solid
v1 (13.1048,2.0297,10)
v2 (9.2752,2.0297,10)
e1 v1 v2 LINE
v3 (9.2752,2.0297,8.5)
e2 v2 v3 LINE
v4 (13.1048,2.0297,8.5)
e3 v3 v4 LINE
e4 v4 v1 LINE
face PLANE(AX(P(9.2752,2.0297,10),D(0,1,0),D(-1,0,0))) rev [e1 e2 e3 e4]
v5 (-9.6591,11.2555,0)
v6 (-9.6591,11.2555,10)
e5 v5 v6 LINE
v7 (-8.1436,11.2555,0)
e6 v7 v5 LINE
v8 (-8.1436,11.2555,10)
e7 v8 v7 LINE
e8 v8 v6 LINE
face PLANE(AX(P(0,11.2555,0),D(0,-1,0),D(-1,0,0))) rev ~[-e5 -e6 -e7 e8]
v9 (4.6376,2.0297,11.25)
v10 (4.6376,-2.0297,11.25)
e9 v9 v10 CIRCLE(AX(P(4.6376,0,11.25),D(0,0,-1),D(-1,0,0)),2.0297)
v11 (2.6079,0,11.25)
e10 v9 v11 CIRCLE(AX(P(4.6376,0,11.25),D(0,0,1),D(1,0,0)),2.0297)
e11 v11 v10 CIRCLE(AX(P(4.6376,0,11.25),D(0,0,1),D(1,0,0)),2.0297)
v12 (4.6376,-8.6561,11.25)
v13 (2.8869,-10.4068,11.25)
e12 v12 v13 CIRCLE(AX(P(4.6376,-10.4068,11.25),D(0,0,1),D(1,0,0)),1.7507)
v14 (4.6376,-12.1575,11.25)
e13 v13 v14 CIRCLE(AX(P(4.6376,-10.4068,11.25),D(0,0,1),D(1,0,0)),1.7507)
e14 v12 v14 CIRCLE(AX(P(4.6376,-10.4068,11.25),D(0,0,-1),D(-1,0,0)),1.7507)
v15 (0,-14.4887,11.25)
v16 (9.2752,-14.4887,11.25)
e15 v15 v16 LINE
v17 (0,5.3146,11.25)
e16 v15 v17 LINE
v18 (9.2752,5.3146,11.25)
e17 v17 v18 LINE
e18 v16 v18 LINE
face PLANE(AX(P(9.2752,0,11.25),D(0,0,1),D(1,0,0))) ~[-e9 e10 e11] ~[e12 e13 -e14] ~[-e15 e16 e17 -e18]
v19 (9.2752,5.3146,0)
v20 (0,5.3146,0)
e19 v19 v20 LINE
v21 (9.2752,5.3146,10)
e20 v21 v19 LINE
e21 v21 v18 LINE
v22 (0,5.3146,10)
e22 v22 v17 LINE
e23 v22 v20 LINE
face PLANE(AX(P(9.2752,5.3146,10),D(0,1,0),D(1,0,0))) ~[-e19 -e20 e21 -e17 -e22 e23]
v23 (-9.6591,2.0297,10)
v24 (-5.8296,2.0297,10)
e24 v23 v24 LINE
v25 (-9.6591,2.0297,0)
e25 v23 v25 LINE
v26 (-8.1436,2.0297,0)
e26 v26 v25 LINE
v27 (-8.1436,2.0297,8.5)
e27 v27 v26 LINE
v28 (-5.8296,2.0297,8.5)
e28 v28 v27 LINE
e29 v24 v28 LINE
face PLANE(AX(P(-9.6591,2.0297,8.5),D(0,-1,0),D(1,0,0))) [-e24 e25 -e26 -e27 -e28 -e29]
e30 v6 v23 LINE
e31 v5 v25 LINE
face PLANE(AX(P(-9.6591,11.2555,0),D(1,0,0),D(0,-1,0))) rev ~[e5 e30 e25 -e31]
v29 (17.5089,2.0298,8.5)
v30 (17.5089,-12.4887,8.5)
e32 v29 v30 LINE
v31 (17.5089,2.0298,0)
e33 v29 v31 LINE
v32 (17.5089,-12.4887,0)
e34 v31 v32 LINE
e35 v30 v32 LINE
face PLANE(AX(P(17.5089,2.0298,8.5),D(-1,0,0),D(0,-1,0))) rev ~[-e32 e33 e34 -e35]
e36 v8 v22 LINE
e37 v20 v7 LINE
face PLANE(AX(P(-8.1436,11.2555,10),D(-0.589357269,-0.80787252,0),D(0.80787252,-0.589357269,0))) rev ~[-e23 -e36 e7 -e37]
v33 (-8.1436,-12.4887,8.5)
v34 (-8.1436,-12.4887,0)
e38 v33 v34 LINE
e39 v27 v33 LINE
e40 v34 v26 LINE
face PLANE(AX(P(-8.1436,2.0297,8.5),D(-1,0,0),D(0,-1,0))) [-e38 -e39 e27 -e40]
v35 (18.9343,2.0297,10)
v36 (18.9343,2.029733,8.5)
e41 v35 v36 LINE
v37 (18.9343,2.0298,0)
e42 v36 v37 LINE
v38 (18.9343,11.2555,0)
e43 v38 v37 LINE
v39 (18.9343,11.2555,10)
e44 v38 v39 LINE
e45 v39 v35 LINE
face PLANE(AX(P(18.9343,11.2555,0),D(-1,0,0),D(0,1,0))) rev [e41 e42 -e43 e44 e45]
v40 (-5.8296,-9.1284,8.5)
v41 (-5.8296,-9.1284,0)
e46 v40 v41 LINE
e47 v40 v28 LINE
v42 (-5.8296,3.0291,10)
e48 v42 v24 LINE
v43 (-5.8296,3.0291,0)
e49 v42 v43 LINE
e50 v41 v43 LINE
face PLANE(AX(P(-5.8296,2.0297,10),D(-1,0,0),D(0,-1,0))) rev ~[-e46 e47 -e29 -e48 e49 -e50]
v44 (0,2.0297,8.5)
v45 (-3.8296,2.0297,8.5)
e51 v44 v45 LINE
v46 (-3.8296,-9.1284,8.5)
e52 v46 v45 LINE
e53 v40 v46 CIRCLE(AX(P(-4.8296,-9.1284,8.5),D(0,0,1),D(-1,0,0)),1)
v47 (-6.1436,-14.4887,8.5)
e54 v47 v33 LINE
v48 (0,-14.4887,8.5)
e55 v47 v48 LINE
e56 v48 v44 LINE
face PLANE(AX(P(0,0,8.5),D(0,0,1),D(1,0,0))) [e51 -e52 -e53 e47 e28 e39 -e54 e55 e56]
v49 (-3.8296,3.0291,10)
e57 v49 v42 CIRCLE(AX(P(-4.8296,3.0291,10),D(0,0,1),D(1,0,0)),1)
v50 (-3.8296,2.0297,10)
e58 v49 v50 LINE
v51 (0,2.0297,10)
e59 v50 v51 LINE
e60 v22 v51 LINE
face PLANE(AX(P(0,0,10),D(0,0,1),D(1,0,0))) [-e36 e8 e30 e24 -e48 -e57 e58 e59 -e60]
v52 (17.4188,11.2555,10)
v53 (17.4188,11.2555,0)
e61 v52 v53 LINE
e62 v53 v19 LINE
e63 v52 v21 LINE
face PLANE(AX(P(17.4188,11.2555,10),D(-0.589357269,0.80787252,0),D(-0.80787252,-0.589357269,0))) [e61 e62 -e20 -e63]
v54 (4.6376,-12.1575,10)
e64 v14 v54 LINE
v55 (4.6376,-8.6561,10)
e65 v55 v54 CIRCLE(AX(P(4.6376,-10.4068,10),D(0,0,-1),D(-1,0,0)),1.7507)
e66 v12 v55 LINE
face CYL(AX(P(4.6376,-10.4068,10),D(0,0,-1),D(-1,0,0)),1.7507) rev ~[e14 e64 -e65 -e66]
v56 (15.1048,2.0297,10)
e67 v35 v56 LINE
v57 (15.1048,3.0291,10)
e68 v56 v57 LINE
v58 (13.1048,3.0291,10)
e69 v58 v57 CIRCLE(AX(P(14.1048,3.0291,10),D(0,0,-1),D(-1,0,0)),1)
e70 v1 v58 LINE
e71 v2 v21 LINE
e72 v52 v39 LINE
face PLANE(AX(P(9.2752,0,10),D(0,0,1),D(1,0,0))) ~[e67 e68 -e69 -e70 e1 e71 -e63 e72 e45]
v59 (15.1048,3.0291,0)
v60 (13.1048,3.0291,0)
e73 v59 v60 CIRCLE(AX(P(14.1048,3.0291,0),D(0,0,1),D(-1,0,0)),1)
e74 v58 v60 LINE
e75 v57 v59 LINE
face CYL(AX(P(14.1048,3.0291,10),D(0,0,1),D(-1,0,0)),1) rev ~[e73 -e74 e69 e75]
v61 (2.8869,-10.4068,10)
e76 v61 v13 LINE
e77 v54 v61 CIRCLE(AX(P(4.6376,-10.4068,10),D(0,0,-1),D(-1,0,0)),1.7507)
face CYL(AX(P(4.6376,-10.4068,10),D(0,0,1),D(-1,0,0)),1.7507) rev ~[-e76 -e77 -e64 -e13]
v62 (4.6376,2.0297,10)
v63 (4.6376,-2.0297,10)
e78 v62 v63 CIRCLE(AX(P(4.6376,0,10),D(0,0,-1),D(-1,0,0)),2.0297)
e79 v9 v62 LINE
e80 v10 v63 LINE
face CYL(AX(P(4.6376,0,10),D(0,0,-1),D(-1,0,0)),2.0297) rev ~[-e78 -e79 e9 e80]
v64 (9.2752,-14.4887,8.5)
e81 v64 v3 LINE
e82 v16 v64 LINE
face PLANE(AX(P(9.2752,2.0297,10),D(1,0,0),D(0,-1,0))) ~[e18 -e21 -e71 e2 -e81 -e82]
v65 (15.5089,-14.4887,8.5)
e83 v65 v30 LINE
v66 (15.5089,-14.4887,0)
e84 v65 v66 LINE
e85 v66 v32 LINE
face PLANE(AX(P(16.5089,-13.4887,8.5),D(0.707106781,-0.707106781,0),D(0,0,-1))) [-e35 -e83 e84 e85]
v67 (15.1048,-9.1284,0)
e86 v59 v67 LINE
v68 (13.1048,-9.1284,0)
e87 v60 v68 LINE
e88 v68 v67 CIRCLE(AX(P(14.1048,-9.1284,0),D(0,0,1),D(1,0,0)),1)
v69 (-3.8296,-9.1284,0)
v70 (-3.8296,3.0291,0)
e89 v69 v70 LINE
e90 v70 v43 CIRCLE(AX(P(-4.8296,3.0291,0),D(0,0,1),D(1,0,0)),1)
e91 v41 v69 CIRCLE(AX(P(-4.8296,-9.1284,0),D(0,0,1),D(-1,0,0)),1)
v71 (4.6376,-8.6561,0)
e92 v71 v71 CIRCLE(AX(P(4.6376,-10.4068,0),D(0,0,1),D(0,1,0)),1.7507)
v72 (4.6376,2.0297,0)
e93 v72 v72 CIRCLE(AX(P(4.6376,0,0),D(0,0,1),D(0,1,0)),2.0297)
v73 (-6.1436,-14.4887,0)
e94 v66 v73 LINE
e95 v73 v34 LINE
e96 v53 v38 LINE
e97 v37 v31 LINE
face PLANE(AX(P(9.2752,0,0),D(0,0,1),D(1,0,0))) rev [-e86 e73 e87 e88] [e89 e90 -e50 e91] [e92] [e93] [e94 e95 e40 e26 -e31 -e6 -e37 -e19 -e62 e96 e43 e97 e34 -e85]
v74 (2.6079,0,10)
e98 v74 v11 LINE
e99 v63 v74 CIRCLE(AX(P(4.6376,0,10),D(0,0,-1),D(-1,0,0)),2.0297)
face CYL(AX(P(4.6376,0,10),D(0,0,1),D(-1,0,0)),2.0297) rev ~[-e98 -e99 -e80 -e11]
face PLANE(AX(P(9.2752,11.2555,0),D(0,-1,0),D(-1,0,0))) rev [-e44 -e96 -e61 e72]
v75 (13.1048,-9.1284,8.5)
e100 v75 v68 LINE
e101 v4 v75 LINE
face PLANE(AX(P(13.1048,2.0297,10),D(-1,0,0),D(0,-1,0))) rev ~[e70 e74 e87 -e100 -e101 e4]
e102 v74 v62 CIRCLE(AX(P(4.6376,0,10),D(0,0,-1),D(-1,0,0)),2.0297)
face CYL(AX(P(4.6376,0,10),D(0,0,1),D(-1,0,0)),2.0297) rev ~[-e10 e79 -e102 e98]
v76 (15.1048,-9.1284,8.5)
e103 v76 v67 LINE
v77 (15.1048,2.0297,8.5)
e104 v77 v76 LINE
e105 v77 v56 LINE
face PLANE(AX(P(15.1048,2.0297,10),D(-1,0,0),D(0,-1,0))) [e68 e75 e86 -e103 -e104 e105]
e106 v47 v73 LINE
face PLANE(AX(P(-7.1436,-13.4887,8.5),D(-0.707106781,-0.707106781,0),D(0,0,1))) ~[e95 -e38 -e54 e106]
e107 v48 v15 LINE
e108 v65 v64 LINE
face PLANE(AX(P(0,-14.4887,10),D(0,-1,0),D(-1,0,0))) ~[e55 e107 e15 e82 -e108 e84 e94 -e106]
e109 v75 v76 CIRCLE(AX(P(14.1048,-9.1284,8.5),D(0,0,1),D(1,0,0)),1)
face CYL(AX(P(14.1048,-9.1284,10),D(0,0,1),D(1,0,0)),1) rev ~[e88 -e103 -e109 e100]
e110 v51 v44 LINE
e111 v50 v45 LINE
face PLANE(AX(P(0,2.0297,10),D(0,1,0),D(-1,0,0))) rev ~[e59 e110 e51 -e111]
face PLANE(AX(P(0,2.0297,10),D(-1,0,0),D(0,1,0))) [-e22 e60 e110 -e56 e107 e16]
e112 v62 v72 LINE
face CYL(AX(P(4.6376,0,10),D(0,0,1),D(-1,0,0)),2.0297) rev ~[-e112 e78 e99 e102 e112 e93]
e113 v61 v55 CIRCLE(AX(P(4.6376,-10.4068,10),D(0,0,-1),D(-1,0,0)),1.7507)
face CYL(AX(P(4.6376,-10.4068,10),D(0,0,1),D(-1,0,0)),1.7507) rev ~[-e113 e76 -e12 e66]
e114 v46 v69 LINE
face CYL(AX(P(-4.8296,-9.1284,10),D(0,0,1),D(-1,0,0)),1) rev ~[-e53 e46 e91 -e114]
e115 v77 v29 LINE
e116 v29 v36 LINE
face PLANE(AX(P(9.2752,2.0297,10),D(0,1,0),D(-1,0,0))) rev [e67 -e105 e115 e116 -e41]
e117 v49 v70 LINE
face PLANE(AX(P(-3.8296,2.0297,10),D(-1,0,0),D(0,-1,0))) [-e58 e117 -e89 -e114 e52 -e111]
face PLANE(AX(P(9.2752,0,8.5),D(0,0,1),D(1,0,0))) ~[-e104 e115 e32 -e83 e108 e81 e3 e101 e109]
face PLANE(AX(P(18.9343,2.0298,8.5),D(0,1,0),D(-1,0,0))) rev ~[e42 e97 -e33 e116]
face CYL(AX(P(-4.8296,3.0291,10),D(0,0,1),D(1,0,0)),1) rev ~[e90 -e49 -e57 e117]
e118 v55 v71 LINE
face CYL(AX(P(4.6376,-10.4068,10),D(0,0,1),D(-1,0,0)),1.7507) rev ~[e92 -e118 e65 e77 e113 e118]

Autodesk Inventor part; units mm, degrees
ref_plane "YZ Plane" through (0, 0, 0) normal (1, 0, 0) x (0, 1, 0)
ref_plane "XZ Plane" through (0, 0, 0) normal (0, 1, 0) x (-1, 0, 0)
ref_plane "XY Plane" through (0, 0, 0) normal (0, 0, 1) x (1, 0, 0)
sketch "스케치1" plane through (0, 0, 0) normal (0, 0, 1) x (1, 0, 0)
  line L0 (0, 11.2555) -> (-9.6591, 11.2555)
  line L1 (-9.6591, 11.2555) -> (-9.6591, -14.4887)
  line L2 (-9.6591, -14.4887) -> (0, -14.4887)
  line L3 (0, -14.4887) -> (0, 11.2555)
  point P0 (0, 0)
extrude "돌출1" add sketch "스케치1" along normal blind 10
sketch "스케치2" plane through (0, 0, 10) normal (0, 0, 1) x (1, 0, 0)
  line L0 (0, 11.2555) -> (-9.6591, 11.2555) projected
  line L1 (0, -14.4887) -> (0, 11.2555) projected
  line L2 (-8.1436, 11.2555) -> (0, 5.3146)
  line L3 (0, 5.3146) -> (9.2752, 5.3146)
  line L4 (9.2752, 5.3146) -> (9.2752, -14.4887)
  line L5 (9.2752, -14.4887) -> (0, -14.4887)
  line L6 (0, -14.4887) -> (0, 5.3146)
  circle A0 centre (4.6376, 0) radius 2.0297
  circle A1 centre (4.6376, -10.4068) radius 1.7507
  line L7 (0, 2.0297) -> (-9.6591, 2.0297)
  line L8 (-9.6591, 2.0297) -> (-9.6591, -14.4887)
  line L9 (-9.6591, -14.4887) -> (0, -14.4887)
  line L10 (0, -14.4887) -> (0, 2.0297)
  arc A2 (-3.8296, 3.0291) -> (-5.8296, 3.0291) centre (-4.8296, 3.0291) ccw
  arc A3 (-5.8296, -9.1284) -> (-3.8296, -9.1284) centre (-4.8296, -9.1284) ccw
  line L11 (-5.8296, 3.0291) -> (-5.8296, -9.1284)
  line L12 (-3.8296, 3.0291) -> (-3.8296, -9.1284)
  point P0 (0, 0)
  dimension "d2" = 2
  dimension "d3" = 2
extrude "돌출2" add sketch "스케치2" against normal blind 10 contours L3 L4 L5 L1
extrude "돌출3" add sketch "스케치2" along normal blind 1.25 contours L3 L4 L5 L1
extrude "돌출4" cut sketch "스케치2" against normal up to next contours L1 L2 L0
extrude "돌출5" cut sketch "스케치2" against normal up to next contours L12 A3 L11 L7 | L7 L11 A2 L12
extrude "돌출6" cut sketch "스케치2" against normal blind 1.5 contours L1 L9 L8 L7 L11 A3 L12 | L12 A3 L11 L7
sketch "스케치3" plane through (0, 0, 8.5) normal (0, 0, 1) x (1, 0, 0)
  line L0 (0, -14.4887) -> (-9.6591, -14.4887) projected
  line L1 (-9.6591, 2.0297) -> (-8.1436, 2.0297)
  line L2 (-8.1436, 2.0297) -> (-8.1436, -14.4887)
  line L3 (-8.1436, -14.4887) -> (-9.6591, -14.4887)
  line L4 (-9.6591, -14.4887) -> (-9.6591, 2.0297)
  point P0 (0, 0)
extrude "돌출7" cut sketch "스케치3" against normal up to next
chamfer "모따기1" distance 2 angle 45 1 edges at (-8.1436, -14.4887, 4.25)
sketch "스케치4" plane through (0, 0, 11.25) normal (0, 0, 1) x (1, 0, 0)
  line L0 (0, -14.4887) -> (9.2752, -14.4887) projected
  line L1 (9.2752, 5.3146) -> (4.6376, 5.3146)
  line L2 (4.6376, 5.3146) -> (4.6376, -14.4887)
  line L3 (4.6376, -14.4887) -> (9.2752, -14.4887)
  line L4 (9.2752, -14.4887) -> (9.2752, 5.3146)
  point P0 (0, 0)
extrude "돌출8" cut sketch "스케치4" against normal up to next
mirror "대칭1" about plane through (4.6376, -14.4887, 11.25) normal (1, 0, 0) of "돌출4", "돌출2", "돌출3", "돌출1", "돌출6", "돌출5"
sketch "스케치5" plane through (9.2752, -14.4887, 8.5) normal (0, 0, 1) x (1, 0, 0)
  line L0 (9.6591, 0) -> (0, 0) projected
  line L1 (9.6591, 16.5185) -> (8.2337, 16.5185)
  line L2 (8.2337, 16.5185) -> (8.2337, 0)
  line L3 (8.2337, 0) -> (9.6591, 0)
  line L4 (9.6591, 0) -> (9.6591, 16.5185)
  point P0 (-9.2752, 14.4887)
extrude "돌출9" cut sketch "스케치5" against normal up to next
chamfer "모따기2" distance 2 angle 45 1 edges at (17.5089, -14.4887, 4.25)
properties part number "240710_part1"
